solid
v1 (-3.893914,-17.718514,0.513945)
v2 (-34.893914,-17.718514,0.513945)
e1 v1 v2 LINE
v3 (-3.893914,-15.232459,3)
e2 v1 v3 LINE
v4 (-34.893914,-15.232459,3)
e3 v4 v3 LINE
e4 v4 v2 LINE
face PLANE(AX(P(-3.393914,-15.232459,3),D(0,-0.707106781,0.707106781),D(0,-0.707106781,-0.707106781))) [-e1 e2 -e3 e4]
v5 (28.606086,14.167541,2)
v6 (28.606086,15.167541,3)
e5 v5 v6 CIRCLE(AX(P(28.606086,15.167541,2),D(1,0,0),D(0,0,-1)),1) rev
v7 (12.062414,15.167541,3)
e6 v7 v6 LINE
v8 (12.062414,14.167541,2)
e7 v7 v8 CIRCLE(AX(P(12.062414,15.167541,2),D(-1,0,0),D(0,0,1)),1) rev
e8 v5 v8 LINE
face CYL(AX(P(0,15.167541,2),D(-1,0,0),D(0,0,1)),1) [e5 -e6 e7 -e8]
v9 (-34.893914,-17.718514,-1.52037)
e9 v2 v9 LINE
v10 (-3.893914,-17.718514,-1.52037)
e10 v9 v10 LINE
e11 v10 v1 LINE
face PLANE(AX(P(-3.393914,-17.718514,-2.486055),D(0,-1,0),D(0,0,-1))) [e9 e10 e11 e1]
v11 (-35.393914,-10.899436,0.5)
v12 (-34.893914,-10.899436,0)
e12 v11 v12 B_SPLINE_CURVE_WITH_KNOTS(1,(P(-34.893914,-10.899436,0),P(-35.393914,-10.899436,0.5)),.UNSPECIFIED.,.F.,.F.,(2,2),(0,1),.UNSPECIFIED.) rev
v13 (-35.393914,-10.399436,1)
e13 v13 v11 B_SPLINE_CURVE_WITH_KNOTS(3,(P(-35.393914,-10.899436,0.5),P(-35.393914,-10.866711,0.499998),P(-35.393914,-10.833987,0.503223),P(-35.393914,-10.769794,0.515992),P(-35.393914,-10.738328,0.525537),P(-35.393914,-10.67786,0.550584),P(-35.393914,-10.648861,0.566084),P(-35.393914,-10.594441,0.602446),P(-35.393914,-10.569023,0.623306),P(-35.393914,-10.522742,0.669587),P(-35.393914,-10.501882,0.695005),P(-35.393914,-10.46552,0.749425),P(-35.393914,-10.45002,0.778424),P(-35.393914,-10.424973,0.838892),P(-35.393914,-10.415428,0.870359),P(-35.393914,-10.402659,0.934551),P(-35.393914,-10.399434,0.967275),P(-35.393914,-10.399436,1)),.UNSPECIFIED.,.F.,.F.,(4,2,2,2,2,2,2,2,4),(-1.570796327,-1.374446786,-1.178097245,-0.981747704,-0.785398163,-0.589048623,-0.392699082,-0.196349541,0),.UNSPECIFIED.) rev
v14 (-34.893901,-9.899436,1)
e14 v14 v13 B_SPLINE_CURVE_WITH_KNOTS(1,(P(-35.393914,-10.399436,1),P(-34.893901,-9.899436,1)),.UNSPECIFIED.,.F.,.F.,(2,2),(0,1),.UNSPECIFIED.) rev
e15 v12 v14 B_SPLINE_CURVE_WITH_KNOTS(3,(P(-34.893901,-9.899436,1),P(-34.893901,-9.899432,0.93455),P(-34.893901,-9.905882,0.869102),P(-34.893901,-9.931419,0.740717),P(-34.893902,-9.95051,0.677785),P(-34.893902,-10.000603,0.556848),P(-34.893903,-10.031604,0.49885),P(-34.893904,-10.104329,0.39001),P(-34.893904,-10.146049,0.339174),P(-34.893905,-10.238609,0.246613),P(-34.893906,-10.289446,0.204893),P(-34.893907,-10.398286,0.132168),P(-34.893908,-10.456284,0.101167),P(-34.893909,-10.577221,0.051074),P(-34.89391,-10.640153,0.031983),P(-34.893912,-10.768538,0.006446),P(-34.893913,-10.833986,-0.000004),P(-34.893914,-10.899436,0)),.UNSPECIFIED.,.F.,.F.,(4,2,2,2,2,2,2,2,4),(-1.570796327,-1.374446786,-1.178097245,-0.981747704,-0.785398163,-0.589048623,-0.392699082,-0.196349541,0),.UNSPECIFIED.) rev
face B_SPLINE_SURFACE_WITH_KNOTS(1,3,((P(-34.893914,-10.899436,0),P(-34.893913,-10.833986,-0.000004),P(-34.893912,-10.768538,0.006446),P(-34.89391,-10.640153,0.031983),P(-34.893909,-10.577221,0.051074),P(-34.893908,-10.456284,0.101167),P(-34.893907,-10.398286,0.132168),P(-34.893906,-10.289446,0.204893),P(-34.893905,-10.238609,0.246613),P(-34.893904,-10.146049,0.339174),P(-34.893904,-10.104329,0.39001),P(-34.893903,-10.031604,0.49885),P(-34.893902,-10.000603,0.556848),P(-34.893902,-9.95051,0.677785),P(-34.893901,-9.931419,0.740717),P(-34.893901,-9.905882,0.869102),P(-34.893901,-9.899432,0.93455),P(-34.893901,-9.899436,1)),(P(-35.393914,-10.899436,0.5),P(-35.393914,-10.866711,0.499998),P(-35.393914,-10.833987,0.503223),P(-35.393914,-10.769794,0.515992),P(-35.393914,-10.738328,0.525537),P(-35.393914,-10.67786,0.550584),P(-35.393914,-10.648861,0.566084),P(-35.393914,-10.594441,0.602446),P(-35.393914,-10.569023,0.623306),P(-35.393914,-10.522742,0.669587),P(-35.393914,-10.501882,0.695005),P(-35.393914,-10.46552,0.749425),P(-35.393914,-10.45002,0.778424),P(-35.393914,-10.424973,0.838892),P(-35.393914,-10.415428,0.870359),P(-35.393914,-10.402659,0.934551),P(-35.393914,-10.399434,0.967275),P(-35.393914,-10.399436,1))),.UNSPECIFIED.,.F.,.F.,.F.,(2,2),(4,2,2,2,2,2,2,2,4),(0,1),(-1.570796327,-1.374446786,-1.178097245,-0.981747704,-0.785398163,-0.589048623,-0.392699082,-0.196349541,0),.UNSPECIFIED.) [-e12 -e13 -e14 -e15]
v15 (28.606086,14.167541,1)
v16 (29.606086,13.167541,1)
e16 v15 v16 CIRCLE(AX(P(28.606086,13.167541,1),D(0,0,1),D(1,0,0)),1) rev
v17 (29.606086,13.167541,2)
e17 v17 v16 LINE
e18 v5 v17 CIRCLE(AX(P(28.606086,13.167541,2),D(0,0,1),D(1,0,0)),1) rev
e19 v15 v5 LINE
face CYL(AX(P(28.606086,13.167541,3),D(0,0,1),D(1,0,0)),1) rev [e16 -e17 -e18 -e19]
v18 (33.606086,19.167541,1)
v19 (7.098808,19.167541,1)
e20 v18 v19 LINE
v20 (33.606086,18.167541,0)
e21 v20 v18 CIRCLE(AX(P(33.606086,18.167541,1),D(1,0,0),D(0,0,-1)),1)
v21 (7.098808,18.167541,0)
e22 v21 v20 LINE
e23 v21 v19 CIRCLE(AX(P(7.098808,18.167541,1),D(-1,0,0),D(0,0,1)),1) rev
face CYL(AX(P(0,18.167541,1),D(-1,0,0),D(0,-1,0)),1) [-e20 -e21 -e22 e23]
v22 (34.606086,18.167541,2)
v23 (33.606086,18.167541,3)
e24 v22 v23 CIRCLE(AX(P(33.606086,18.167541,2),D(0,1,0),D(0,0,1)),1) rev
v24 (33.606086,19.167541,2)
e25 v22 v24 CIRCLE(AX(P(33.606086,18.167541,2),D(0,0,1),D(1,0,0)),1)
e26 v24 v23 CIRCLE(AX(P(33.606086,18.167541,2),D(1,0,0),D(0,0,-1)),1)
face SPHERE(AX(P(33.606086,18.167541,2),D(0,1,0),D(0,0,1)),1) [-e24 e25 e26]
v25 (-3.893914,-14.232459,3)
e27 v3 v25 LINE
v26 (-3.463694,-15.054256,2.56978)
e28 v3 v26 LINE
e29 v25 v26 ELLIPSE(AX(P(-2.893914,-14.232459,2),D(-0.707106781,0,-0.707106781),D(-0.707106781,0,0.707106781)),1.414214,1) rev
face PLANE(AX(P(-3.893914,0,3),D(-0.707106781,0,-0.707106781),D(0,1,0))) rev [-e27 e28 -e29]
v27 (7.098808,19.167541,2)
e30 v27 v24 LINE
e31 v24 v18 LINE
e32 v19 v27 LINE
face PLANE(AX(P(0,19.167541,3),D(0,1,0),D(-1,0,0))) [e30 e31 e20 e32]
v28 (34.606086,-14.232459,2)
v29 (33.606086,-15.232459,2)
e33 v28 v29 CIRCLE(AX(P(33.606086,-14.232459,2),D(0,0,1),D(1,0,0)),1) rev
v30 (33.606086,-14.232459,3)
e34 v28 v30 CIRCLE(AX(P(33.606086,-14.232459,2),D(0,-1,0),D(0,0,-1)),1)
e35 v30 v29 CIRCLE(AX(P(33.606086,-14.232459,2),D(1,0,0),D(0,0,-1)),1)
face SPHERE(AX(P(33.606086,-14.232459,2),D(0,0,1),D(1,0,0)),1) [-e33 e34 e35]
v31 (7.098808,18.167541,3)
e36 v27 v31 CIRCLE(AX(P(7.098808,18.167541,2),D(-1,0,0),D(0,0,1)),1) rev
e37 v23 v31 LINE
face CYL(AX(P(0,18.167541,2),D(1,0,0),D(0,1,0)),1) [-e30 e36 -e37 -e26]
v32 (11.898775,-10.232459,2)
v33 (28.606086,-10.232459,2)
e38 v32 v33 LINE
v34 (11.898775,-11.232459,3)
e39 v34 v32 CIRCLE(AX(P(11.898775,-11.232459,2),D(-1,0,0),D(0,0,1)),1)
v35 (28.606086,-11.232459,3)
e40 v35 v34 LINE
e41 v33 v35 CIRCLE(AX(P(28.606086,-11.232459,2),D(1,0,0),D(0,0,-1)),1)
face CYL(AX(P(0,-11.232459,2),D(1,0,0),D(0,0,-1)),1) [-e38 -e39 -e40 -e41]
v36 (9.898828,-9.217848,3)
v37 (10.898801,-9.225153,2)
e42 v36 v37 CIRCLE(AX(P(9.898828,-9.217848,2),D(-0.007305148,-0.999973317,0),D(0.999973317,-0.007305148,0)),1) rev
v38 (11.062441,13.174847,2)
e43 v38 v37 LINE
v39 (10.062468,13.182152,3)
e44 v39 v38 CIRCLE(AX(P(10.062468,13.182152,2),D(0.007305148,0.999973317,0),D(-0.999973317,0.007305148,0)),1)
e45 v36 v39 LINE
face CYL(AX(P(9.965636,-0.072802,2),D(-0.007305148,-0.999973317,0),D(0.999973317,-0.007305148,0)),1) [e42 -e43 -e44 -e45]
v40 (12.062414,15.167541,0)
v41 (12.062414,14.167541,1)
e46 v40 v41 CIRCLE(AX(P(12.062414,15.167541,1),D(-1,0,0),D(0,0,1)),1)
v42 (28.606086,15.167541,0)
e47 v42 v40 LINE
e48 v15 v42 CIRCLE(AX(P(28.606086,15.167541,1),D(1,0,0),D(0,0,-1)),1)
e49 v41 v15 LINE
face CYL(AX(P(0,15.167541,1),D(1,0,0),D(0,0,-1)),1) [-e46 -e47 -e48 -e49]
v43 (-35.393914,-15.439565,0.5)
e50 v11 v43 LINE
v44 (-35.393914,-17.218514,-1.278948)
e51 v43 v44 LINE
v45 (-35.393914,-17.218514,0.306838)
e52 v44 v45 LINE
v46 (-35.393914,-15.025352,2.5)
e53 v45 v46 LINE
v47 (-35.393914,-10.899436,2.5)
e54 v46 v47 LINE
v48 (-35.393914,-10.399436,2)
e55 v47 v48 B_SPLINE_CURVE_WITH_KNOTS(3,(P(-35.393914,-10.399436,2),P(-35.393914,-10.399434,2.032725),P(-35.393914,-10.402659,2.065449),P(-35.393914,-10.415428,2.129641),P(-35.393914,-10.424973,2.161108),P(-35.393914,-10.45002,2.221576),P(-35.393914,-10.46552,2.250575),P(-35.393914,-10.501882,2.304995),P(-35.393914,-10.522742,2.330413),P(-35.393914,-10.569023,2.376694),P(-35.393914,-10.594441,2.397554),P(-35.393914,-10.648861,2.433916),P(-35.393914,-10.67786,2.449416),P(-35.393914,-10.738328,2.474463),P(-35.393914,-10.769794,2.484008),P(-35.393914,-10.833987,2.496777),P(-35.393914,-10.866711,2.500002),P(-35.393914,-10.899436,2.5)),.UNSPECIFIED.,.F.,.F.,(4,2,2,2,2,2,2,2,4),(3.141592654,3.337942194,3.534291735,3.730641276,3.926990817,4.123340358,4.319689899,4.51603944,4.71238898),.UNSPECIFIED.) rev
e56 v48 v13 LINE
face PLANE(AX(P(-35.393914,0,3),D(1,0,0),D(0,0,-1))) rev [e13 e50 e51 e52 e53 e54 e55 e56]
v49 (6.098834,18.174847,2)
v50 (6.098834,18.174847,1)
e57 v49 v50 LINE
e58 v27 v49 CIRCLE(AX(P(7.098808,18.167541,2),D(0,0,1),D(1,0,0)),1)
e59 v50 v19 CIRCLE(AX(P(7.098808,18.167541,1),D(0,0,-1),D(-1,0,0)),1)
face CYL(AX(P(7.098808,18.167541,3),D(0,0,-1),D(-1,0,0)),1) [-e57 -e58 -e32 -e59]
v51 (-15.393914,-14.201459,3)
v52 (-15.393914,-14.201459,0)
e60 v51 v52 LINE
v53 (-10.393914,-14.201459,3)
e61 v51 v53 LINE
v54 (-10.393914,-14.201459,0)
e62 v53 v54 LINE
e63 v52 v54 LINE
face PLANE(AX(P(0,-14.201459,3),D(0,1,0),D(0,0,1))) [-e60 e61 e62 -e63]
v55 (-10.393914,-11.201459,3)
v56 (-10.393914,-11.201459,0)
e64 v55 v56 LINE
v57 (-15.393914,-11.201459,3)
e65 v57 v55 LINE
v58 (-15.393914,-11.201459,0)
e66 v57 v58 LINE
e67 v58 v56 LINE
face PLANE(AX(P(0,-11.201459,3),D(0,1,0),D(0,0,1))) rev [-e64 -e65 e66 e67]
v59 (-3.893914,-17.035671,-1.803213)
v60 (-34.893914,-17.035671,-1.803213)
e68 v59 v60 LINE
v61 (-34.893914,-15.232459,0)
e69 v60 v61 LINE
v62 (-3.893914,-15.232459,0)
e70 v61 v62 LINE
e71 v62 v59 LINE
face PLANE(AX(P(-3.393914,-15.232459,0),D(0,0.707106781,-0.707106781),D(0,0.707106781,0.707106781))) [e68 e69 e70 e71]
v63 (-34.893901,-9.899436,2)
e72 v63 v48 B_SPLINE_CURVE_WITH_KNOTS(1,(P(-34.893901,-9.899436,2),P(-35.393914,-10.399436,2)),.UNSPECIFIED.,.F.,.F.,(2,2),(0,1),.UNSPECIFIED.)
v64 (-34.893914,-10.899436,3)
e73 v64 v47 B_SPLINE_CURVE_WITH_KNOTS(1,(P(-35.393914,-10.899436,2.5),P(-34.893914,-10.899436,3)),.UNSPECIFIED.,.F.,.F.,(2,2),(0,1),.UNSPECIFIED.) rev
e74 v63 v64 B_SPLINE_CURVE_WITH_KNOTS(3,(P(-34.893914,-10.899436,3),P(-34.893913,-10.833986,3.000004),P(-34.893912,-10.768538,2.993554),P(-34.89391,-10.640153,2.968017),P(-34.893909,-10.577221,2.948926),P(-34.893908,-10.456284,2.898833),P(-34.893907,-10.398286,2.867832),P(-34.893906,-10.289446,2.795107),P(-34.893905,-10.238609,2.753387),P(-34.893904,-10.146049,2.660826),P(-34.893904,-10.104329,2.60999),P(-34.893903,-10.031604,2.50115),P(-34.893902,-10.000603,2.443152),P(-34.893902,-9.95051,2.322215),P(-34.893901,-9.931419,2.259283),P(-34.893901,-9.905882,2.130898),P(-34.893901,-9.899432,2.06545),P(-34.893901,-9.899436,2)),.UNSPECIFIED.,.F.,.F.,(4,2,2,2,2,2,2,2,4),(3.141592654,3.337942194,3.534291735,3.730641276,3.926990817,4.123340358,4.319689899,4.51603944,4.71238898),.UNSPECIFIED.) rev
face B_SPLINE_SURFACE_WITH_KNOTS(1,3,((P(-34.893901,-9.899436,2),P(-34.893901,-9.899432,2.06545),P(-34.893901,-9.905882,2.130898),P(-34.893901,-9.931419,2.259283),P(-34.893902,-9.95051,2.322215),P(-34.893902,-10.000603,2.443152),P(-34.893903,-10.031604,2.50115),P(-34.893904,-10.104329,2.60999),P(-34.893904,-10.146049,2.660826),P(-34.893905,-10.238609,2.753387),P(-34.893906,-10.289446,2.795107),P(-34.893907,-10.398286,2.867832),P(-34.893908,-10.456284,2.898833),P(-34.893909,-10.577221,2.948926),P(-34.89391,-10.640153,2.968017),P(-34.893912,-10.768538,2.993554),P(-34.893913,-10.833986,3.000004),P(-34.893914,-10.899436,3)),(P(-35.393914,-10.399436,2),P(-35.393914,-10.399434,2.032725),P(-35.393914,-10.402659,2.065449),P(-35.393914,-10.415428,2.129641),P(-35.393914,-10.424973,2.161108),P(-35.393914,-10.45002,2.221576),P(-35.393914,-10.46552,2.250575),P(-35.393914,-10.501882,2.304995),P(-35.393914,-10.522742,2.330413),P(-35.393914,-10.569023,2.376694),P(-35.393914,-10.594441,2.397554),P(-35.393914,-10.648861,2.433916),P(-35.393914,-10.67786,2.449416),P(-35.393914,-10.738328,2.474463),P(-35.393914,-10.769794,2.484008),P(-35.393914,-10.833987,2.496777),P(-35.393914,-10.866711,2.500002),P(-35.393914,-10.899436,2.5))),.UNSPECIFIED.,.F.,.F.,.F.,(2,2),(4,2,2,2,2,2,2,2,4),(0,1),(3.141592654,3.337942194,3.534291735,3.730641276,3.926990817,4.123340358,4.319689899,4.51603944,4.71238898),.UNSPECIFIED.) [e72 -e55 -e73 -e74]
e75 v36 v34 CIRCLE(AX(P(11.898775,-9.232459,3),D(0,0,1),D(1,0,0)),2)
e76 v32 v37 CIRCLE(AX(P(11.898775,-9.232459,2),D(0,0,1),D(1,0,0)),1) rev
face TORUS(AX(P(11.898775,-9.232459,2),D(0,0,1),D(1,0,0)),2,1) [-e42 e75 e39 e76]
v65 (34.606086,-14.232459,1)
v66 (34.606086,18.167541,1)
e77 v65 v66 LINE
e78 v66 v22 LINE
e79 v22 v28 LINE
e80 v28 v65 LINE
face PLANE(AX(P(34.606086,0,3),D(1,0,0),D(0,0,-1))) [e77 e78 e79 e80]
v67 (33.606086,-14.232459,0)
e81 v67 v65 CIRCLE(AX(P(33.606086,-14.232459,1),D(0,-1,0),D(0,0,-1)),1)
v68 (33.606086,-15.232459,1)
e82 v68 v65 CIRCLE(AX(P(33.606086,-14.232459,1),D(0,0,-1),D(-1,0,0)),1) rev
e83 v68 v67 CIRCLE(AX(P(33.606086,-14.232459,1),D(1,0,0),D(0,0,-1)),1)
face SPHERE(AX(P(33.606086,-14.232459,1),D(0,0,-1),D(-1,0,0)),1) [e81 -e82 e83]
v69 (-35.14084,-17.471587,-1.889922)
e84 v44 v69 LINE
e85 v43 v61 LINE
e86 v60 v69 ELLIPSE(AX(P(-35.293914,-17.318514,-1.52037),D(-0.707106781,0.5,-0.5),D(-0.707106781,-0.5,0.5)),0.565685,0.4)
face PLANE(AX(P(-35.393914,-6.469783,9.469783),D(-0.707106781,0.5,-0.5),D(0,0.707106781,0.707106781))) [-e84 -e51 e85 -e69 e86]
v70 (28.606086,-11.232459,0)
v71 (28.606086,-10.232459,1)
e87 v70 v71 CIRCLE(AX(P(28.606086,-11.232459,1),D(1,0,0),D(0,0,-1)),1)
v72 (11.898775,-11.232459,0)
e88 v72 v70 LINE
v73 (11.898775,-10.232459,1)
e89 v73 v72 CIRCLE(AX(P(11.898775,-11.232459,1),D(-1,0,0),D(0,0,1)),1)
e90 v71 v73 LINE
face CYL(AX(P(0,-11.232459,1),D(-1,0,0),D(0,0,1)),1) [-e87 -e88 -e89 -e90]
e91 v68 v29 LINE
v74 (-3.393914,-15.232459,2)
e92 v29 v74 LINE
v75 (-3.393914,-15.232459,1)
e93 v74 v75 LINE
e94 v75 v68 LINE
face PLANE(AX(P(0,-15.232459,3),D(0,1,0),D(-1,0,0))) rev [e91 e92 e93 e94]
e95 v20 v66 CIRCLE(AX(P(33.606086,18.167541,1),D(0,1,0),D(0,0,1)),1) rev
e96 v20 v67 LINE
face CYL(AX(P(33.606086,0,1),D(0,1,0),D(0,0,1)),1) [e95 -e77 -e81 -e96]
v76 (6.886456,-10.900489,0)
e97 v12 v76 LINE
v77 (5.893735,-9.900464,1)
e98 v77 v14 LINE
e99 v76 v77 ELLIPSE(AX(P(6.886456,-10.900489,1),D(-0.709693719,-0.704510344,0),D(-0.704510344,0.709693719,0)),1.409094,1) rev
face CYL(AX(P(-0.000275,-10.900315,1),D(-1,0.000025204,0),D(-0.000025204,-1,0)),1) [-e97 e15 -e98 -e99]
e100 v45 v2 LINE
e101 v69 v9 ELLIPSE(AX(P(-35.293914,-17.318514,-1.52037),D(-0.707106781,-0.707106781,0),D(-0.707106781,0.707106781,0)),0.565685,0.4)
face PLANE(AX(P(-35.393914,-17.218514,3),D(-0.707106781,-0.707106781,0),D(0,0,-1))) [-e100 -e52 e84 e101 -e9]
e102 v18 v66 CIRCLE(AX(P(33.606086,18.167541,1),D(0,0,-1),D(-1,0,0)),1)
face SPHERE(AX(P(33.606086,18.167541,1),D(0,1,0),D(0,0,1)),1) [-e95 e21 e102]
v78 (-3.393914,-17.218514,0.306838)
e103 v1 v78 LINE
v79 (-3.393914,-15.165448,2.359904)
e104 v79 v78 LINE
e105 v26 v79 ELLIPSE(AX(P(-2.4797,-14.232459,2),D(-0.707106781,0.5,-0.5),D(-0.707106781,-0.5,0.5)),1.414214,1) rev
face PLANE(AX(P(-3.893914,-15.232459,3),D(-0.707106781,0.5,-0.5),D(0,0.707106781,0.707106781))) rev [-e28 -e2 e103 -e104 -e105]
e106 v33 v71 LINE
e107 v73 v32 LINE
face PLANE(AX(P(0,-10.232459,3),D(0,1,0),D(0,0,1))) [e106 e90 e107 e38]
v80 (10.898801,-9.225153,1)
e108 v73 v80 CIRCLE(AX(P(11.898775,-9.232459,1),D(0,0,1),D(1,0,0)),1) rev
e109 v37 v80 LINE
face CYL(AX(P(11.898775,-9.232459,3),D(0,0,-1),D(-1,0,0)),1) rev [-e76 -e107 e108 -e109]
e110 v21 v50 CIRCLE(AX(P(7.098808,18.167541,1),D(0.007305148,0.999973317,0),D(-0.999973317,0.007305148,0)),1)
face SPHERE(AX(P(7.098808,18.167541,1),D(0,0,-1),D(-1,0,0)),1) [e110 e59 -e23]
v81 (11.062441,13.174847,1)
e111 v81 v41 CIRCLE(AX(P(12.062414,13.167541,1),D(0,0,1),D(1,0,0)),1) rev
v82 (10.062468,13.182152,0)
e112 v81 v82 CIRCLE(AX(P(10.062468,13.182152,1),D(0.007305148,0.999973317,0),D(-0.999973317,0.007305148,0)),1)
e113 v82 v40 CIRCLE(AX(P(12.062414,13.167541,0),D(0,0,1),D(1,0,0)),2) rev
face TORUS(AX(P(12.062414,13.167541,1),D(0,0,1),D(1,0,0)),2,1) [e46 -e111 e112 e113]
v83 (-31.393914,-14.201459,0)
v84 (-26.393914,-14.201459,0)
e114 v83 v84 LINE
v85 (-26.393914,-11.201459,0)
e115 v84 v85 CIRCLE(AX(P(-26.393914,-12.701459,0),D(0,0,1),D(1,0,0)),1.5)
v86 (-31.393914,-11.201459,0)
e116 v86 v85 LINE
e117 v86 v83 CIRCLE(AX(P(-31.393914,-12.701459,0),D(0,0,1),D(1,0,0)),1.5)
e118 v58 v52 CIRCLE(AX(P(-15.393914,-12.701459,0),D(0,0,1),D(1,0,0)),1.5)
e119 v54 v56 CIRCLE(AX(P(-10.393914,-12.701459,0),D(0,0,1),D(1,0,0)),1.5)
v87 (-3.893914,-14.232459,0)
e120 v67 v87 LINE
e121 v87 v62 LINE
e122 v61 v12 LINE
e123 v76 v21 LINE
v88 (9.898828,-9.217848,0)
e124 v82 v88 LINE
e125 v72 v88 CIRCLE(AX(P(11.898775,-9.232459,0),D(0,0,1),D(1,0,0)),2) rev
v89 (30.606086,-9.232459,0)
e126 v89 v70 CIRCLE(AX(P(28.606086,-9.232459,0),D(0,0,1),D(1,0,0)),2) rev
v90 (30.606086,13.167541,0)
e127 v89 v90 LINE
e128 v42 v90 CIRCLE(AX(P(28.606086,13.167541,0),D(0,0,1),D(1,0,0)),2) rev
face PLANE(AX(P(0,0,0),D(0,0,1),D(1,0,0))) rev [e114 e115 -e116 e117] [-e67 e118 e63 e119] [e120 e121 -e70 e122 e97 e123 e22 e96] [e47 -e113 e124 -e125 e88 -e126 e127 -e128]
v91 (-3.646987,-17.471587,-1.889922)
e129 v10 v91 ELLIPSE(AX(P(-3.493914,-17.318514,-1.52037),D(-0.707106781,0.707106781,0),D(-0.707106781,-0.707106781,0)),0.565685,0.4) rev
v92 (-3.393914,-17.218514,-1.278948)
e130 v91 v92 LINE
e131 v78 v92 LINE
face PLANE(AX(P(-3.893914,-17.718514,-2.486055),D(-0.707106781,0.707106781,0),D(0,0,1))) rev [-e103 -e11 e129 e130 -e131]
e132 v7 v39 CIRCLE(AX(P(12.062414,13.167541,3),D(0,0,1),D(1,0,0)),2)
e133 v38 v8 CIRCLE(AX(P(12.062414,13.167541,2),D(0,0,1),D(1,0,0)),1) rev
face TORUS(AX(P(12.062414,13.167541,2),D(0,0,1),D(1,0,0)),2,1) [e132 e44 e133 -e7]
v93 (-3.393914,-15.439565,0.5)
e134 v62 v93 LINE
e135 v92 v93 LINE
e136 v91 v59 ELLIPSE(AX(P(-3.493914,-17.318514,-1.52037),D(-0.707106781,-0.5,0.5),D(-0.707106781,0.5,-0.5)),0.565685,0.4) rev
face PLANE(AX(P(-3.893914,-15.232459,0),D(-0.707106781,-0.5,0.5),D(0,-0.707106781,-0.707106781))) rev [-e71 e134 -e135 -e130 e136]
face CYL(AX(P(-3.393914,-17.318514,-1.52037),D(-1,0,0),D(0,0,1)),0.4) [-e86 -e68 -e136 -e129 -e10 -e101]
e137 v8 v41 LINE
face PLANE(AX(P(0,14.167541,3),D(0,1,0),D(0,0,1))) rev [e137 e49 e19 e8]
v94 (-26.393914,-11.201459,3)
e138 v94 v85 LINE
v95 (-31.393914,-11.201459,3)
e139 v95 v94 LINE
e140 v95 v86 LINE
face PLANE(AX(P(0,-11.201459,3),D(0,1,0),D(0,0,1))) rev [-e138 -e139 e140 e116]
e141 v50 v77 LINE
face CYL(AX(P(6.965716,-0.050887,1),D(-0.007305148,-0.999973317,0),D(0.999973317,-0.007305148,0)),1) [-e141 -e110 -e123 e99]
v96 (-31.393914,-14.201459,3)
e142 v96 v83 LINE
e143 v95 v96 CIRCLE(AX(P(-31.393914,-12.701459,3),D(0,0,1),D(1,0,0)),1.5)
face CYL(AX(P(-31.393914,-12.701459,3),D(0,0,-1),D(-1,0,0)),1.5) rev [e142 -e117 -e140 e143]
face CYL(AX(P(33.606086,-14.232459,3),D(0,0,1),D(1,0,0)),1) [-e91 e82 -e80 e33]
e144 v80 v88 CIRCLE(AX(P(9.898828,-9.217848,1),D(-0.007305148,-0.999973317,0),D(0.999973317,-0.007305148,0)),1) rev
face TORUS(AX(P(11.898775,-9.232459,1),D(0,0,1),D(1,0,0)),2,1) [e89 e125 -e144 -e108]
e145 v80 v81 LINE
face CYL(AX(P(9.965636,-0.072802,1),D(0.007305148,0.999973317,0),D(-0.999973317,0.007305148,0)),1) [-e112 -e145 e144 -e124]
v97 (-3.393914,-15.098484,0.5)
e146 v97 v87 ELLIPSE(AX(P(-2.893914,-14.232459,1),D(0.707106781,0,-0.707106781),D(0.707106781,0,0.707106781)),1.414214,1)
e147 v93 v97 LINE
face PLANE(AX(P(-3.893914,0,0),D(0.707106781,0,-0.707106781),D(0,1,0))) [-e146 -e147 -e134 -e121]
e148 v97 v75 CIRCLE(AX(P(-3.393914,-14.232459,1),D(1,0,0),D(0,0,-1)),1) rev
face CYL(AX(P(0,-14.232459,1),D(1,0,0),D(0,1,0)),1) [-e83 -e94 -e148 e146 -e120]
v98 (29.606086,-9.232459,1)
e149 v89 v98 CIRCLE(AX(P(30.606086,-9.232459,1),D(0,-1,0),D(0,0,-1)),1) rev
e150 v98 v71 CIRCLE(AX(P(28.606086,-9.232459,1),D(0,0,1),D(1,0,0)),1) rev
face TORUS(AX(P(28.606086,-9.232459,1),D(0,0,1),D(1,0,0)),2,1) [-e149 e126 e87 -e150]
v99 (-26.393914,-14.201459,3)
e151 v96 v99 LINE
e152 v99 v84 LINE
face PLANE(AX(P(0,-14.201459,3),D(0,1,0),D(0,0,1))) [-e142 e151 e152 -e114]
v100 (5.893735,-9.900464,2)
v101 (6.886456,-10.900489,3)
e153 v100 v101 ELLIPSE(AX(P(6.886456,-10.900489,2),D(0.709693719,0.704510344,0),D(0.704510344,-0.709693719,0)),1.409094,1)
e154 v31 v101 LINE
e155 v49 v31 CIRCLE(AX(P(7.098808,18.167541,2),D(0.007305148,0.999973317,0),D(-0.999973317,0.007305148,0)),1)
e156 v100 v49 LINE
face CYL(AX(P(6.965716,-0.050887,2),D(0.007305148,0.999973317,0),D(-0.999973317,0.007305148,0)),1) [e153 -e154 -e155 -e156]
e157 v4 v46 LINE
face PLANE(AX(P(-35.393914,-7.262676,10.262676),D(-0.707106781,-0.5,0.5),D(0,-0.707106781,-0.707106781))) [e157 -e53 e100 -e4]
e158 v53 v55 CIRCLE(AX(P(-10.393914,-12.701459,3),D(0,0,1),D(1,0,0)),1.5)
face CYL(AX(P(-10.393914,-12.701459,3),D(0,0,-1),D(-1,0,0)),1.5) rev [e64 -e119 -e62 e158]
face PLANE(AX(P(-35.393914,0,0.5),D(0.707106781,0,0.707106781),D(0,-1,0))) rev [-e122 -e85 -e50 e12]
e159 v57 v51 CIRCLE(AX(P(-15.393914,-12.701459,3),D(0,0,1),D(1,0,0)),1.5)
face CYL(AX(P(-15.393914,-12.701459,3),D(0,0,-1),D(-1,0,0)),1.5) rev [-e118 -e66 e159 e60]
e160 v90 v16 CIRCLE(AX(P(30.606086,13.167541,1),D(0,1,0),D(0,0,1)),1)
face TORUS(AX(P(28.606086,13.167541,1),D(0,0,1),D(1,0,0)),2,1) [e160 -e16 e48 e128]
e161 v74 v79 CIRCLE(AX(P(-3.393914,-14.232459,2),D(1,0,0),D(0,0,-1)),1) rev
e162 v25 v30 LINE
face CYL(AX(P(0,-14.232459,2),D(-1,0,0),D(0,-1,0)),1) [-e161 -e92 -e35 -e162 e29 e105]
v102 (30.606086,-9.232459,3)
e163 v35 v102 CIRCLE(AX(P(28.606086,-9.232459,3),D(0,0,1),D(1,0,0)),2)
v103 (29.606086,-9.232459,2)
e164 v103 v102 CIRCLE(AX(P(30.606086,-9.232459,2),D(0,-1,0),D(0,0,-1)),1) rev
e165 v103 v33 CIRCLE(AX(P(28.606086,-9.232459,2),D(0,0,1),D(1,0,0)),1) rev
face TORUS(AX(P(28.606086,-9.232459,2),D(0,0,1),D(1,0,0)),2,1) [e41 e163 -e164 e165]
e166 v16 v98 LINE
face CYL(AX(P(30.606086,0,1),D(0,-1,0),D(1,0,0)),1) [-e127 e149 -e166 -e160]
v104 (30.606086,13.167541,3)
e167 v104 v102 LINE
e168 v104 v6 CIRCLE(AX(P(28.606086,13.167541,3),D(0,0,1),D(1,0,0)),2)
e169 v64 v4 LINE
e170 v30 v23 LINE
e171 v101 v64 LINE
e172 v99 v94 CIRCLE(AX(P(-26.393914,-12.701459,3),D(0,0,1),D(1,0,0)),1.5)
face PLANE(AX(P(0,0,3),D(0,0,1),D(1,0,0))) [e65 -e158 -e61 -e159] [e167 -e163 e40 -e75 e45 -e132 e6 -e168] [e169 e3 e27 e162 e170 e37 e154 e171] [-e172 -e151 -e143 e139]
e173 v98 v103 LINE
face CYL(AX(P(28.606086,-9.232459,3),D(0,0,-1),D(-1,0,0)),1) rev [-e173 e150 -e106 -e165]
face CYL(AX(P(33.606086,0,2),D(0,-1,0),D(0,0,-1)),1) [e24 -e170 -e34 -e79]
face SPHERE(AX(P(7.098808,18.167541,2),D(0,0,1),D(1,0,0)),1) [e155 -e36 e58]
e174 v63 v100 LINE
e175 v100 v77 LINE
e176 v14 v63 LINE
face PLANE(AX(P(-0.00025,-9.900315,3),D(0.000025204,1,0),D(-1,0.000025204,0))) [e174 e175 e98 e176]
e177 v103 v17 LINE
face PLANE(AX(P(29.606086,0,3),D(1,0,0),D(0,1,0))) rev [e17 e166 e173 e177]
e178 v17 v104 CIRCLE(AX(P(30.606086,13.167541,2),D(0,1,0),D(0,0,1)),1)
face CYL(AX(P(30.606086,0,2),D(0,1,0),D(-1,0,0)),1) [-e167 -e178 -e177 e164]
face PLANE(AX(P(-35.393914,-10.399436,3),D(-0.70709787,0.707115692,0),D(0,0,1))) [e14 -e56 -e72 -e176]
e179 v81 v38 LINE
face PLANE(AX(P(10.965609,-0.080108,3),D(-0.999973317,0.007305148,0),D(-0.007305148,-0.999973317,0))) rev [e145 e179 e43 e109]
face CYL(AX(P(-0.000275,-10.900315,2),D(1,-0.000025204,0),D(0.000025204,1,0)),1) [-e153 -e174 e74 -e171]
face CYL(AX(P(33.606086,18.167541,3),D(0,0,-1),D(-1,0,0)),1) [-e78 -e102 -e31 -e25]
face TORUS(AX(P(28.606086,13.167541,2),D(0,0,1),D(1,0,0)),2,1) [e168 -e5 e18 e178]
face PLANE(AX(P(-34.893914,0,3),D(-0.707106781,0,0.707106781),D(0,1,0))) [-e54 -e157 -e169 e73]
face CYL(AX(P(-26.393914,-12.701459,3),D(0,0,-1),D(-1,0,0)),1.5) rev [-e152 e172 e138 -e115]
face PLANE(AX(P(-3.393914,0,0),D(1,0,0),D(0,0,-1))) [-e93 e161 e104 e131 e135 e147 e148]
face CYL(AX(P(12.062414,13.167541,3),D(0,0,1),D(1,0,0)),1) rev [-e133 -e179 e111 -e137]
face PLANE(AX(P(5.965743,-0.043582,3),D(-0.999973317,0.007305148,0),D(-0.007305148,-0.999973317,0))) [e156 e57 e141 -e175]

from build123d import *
from OCP.BRepFilletAPI import BRepFilletAPI_MakeChamfer

# Parameters (mm, degrees)
RESSALTO_EXTRUS_O1_DEPTH = 3
RESSALTO_EXTRUS_O2_DEPTH = 32
FILETE1_R                = 1
CHANFRO1_SIZE            = 0.5
CHANFRO1_SIZE_2          = 0.499987399
CHANFRO1_SIZE_3          = 0.499991089
FILETE10_R               = 0.4


with BuildPart() as part:
    # Esboço1 → Ressalto-extrusão1 (new body)
    with BuildSketch(Plane.XY):
        Polygon((5.893734702, -9.900463955), (6.106086441, 19.167541422), (34.606086441, 19.167541422), (34.606086441, -15.232458579), (-35.393913559, -15.232458579), (-35.393913559, -9.89942335), align=None)
        Polygon((10.891442786, -10.232458579), (11.069693146, 14.167541422), (29.606086441, 14.167541422), (29.606086441, -10.232458579), align=None, mode=Mode.SUBTRACT)
        with BuildLine():
            Line((-31.393913559, -11.201458579), (-26.393913559, -11.201458579))
            ThreePointArc((-26.393913559, -11.201458579), (-24.893913559, -12.701458579), (-26.393913559, -14.201458579))
            Line((-26.393913559, -14.201458579), (-31.393913559, -14.201458579))
            ThreePointArc((-31.393913559, -14.201458579), (-32.893913559, -12.701458579), (-31.393913559, -11.201458579))
        make_face(mode=Mode.SUBTRACT)
        with BuildLine():
            Line((-15.393913559, -11.201458579), (-10.393913559, -11.201458579))
            ThreePointArc((-10.393913559, -11.201458579), (-8.893913559, -12.701458579), (-10.393913559, -14.201458579))
            Line((-10.393913559, -14.201458579), (-15.393913559, -14.201458579))
            ThreePointArc((-15.393913559, -14.201458579), (-16.893913559, -12.701458579), (-15.393913559, -11.201458579))
        make_face(mode=Mode.SUBTRACT)
    extrude(amount=RESSALTO_EXTRUS_O1_DEPTH)

    # Esboço2 → Ressalto-extrusão2 (add)
    with BuildSketch(Plane.ZY.offset(35.393913559)):
        Polygon((0, -15.232458579), (-2.486055277, -17.718513856), (0.513944723, -17.718513856), (3, -15.232458579), align=None)
    extrude(amount=-RESSALTO_EXTRUS_O2_DEPTH)

    # Filete1
    filete1_edges = [part.edges().sort_by_distance(p)[0] for p in [
        (5.999910572, 4.633538733, 0),
        (20.356086441, 19.167541422, 0),
        (34.606086441, 1.967541422, 0),
        (-14.750089428, -9.899943653, 0),
        (29.606086441, 1.967541422, 0),
        (20.337889794, 14.167541422, 0),
        (10.980567966, 1.967541422, 0),
        (20.248764614, -10.232458579, 0),
        (6.106086441, 19.167541422, 1.5),
        (34.606086441, 19.167541422, 1.5),
        (34.606086441, -15.232458579, 1.5),
        (29.606086441, -10.232458579, 1.5),
        (29.606086441, 14.167541422, 1.5),
        (11.069693146, 14.167541422, 1.5),
        (10.891442786, -10.232458579, 1.5),
        (20.248764614, -10.232458579, 3),
        (10.980567966, 1.967541422, 3),
        (15.606086441, -15.232458579, 0),
        (15.606086441, -15.232458579, 3),
        (20.337889794, 14.167541422, 3),
        (29.606086441, 1.967541422, 3),
        (-14.750089428, -9.899943653, 3),
        (34.606086441, 1.967541422, 3),
        (20.356086441, 19.167541422, 3),
        (5.999910572, 4.633538733, 3),
    ]]
    fillet(filete1_edges, radius=FILETE1_R)

    # Chanfro1
    chanfro1_edges_1 = [part.edges().sort_by_distance(p)[0] for p in [
        (-35.393913559, -9.89942335, 1.5),
    ]]
    chanfro1_side_1 = [part.faces().sort_by_distance(p)[0] for p in [
        (-35.383913811, -9.899423602, 1.5),
    ]]
    chanfro1_edges_2 = [part.edges().sort_by_distance(p)[0] for p in [
        (-35.393895737, -10.19231657, 0.292893219),
    ]]
    chanfro1_side_2 = [part.faces().sort_by_distance(p)[0] for p in [
        (-35.393895737, -10.199387512, 0.299964161),
    ]]
    chanfro1_edges_3 = [part.edges().sort_by_distance(p)[0] for p in [
        (-35.393895737, -10.19231657, 2.707106781),
    ]]
    chanfro1_side_3 = [part.faces().sort_by_distance(p)[0] for p in [
        (-35.393895737, -10.199387512, 2.700035839),
    ]]
    chanfro1_edges_4 = [part.edges().sort_by_distance(p)[0] for p in [
        (-35.393913559, -13.065940965, 0),
        (-35.393913559, -13.065940965, 3),
    ]]
    chanfro1 = BRepFilletAPI_MakeChamfer(part.part.solid().wrapped)
    for e in chanfro1_edges_1:
        chanfro1.Add(CHANFRO1_SIZE, CHANFRO1_SIZE_2, e.wrapped, chanfro1_side_1[0].wrapped)
    for e in chanfro1_edges_2:
        chanfro1.Add(CHANFRO1_SIZE, CHANFRO1_SIZE_3, e.wrapped, chanfro1_side_2[0].wrapped)
    for e in chanfro1_edges_3:
        chanfro1.Add(CHANFRO1_SIZE, CHANFRO1_SIZE_3, e.wrapped, chanfro1_side_3[0].wrapped)
    for e in chanfro1_edges_4:
        chanfro1.Add(CHANFRO1_SIZE, e.wrapped)
    add(Compound.cast(chanfro1.Shape()), mode=Mode.REPLACE)
    chanfro1_2_edges = [part.edges().sort_by_distance(p)[0] for p in [
        (-35.393913559, -16.475486217, -1.243027639),
    ]]
    chamfer(chanfro1_2_edges, length=CHANFRO1_SIZE)
    chanfro1_3_edges = [part.edges().sort_by_distance(p)[0] for p in [
        (-35.393913559, -16.725479917, 1.506978662),
    ]]
    chamfer(chanfro1_3_edges, length=CHANFRO1_SIZE)
    chanfro1_4_edges = [part.edges().sort_by_distance(p)[0] for p in [
        (-35.393913559, -17.718513856, -0.986055277),
    ]]
    chamfer(chanfro1_4_edges, length=CHANFRO1_SIZE)
    chanfro1_5_edges = [part.edges().sort_by_distance(p)[0] for p in [
        (-3.393913559, -14.732458579, 3),
    ]]
    chamfer(chanfro1_5_edges, length=CHANFRO1_SIZE)
    chanfro1_6_edges = [part.edges().sort_by_distance(p)[0] for p in [
        (-3.393913559, -16.475486217, -1.243027639),
    ]]
    chamfer(chanfro1_6_edges, length=CHANFRO1_SIZE)
    chanfro1_7_edges = [part.edges().sort_by_distance(p)[0] for p in [
        (-3.393913559, -16.725486217, 1.506972361),
    ]]
    chamfer(chanfro1_7_edges, length=CHANFRO1_SIZE)
    chanfro1_8_edges = [part.edges().sort_by_distance(p)[0] for p in [
        (-3.393913559, -17.718513856, -0.986055277),
    ]]
    chamfer(chanfro1_8_edges, length=CHANFRO1_SIZE)
    chanfro1_9_edges = [part.edges().sort_by_distance(p)[0] for p in [
        (-3.393913559, -14.732458579, 0),
    ]]
    chamfer(chanfro1_9_edges, length=CHANFRO1_SIZE)

    # Filete10
    filete10_edges = [part.edges().sort_by_distance(p)[0] for p in [
        (-19.393913559, -17.718513856, -2.486055277),
    ]]
    fillet(filete10_edges, radius=FILETE10_R)


solid = part.part
